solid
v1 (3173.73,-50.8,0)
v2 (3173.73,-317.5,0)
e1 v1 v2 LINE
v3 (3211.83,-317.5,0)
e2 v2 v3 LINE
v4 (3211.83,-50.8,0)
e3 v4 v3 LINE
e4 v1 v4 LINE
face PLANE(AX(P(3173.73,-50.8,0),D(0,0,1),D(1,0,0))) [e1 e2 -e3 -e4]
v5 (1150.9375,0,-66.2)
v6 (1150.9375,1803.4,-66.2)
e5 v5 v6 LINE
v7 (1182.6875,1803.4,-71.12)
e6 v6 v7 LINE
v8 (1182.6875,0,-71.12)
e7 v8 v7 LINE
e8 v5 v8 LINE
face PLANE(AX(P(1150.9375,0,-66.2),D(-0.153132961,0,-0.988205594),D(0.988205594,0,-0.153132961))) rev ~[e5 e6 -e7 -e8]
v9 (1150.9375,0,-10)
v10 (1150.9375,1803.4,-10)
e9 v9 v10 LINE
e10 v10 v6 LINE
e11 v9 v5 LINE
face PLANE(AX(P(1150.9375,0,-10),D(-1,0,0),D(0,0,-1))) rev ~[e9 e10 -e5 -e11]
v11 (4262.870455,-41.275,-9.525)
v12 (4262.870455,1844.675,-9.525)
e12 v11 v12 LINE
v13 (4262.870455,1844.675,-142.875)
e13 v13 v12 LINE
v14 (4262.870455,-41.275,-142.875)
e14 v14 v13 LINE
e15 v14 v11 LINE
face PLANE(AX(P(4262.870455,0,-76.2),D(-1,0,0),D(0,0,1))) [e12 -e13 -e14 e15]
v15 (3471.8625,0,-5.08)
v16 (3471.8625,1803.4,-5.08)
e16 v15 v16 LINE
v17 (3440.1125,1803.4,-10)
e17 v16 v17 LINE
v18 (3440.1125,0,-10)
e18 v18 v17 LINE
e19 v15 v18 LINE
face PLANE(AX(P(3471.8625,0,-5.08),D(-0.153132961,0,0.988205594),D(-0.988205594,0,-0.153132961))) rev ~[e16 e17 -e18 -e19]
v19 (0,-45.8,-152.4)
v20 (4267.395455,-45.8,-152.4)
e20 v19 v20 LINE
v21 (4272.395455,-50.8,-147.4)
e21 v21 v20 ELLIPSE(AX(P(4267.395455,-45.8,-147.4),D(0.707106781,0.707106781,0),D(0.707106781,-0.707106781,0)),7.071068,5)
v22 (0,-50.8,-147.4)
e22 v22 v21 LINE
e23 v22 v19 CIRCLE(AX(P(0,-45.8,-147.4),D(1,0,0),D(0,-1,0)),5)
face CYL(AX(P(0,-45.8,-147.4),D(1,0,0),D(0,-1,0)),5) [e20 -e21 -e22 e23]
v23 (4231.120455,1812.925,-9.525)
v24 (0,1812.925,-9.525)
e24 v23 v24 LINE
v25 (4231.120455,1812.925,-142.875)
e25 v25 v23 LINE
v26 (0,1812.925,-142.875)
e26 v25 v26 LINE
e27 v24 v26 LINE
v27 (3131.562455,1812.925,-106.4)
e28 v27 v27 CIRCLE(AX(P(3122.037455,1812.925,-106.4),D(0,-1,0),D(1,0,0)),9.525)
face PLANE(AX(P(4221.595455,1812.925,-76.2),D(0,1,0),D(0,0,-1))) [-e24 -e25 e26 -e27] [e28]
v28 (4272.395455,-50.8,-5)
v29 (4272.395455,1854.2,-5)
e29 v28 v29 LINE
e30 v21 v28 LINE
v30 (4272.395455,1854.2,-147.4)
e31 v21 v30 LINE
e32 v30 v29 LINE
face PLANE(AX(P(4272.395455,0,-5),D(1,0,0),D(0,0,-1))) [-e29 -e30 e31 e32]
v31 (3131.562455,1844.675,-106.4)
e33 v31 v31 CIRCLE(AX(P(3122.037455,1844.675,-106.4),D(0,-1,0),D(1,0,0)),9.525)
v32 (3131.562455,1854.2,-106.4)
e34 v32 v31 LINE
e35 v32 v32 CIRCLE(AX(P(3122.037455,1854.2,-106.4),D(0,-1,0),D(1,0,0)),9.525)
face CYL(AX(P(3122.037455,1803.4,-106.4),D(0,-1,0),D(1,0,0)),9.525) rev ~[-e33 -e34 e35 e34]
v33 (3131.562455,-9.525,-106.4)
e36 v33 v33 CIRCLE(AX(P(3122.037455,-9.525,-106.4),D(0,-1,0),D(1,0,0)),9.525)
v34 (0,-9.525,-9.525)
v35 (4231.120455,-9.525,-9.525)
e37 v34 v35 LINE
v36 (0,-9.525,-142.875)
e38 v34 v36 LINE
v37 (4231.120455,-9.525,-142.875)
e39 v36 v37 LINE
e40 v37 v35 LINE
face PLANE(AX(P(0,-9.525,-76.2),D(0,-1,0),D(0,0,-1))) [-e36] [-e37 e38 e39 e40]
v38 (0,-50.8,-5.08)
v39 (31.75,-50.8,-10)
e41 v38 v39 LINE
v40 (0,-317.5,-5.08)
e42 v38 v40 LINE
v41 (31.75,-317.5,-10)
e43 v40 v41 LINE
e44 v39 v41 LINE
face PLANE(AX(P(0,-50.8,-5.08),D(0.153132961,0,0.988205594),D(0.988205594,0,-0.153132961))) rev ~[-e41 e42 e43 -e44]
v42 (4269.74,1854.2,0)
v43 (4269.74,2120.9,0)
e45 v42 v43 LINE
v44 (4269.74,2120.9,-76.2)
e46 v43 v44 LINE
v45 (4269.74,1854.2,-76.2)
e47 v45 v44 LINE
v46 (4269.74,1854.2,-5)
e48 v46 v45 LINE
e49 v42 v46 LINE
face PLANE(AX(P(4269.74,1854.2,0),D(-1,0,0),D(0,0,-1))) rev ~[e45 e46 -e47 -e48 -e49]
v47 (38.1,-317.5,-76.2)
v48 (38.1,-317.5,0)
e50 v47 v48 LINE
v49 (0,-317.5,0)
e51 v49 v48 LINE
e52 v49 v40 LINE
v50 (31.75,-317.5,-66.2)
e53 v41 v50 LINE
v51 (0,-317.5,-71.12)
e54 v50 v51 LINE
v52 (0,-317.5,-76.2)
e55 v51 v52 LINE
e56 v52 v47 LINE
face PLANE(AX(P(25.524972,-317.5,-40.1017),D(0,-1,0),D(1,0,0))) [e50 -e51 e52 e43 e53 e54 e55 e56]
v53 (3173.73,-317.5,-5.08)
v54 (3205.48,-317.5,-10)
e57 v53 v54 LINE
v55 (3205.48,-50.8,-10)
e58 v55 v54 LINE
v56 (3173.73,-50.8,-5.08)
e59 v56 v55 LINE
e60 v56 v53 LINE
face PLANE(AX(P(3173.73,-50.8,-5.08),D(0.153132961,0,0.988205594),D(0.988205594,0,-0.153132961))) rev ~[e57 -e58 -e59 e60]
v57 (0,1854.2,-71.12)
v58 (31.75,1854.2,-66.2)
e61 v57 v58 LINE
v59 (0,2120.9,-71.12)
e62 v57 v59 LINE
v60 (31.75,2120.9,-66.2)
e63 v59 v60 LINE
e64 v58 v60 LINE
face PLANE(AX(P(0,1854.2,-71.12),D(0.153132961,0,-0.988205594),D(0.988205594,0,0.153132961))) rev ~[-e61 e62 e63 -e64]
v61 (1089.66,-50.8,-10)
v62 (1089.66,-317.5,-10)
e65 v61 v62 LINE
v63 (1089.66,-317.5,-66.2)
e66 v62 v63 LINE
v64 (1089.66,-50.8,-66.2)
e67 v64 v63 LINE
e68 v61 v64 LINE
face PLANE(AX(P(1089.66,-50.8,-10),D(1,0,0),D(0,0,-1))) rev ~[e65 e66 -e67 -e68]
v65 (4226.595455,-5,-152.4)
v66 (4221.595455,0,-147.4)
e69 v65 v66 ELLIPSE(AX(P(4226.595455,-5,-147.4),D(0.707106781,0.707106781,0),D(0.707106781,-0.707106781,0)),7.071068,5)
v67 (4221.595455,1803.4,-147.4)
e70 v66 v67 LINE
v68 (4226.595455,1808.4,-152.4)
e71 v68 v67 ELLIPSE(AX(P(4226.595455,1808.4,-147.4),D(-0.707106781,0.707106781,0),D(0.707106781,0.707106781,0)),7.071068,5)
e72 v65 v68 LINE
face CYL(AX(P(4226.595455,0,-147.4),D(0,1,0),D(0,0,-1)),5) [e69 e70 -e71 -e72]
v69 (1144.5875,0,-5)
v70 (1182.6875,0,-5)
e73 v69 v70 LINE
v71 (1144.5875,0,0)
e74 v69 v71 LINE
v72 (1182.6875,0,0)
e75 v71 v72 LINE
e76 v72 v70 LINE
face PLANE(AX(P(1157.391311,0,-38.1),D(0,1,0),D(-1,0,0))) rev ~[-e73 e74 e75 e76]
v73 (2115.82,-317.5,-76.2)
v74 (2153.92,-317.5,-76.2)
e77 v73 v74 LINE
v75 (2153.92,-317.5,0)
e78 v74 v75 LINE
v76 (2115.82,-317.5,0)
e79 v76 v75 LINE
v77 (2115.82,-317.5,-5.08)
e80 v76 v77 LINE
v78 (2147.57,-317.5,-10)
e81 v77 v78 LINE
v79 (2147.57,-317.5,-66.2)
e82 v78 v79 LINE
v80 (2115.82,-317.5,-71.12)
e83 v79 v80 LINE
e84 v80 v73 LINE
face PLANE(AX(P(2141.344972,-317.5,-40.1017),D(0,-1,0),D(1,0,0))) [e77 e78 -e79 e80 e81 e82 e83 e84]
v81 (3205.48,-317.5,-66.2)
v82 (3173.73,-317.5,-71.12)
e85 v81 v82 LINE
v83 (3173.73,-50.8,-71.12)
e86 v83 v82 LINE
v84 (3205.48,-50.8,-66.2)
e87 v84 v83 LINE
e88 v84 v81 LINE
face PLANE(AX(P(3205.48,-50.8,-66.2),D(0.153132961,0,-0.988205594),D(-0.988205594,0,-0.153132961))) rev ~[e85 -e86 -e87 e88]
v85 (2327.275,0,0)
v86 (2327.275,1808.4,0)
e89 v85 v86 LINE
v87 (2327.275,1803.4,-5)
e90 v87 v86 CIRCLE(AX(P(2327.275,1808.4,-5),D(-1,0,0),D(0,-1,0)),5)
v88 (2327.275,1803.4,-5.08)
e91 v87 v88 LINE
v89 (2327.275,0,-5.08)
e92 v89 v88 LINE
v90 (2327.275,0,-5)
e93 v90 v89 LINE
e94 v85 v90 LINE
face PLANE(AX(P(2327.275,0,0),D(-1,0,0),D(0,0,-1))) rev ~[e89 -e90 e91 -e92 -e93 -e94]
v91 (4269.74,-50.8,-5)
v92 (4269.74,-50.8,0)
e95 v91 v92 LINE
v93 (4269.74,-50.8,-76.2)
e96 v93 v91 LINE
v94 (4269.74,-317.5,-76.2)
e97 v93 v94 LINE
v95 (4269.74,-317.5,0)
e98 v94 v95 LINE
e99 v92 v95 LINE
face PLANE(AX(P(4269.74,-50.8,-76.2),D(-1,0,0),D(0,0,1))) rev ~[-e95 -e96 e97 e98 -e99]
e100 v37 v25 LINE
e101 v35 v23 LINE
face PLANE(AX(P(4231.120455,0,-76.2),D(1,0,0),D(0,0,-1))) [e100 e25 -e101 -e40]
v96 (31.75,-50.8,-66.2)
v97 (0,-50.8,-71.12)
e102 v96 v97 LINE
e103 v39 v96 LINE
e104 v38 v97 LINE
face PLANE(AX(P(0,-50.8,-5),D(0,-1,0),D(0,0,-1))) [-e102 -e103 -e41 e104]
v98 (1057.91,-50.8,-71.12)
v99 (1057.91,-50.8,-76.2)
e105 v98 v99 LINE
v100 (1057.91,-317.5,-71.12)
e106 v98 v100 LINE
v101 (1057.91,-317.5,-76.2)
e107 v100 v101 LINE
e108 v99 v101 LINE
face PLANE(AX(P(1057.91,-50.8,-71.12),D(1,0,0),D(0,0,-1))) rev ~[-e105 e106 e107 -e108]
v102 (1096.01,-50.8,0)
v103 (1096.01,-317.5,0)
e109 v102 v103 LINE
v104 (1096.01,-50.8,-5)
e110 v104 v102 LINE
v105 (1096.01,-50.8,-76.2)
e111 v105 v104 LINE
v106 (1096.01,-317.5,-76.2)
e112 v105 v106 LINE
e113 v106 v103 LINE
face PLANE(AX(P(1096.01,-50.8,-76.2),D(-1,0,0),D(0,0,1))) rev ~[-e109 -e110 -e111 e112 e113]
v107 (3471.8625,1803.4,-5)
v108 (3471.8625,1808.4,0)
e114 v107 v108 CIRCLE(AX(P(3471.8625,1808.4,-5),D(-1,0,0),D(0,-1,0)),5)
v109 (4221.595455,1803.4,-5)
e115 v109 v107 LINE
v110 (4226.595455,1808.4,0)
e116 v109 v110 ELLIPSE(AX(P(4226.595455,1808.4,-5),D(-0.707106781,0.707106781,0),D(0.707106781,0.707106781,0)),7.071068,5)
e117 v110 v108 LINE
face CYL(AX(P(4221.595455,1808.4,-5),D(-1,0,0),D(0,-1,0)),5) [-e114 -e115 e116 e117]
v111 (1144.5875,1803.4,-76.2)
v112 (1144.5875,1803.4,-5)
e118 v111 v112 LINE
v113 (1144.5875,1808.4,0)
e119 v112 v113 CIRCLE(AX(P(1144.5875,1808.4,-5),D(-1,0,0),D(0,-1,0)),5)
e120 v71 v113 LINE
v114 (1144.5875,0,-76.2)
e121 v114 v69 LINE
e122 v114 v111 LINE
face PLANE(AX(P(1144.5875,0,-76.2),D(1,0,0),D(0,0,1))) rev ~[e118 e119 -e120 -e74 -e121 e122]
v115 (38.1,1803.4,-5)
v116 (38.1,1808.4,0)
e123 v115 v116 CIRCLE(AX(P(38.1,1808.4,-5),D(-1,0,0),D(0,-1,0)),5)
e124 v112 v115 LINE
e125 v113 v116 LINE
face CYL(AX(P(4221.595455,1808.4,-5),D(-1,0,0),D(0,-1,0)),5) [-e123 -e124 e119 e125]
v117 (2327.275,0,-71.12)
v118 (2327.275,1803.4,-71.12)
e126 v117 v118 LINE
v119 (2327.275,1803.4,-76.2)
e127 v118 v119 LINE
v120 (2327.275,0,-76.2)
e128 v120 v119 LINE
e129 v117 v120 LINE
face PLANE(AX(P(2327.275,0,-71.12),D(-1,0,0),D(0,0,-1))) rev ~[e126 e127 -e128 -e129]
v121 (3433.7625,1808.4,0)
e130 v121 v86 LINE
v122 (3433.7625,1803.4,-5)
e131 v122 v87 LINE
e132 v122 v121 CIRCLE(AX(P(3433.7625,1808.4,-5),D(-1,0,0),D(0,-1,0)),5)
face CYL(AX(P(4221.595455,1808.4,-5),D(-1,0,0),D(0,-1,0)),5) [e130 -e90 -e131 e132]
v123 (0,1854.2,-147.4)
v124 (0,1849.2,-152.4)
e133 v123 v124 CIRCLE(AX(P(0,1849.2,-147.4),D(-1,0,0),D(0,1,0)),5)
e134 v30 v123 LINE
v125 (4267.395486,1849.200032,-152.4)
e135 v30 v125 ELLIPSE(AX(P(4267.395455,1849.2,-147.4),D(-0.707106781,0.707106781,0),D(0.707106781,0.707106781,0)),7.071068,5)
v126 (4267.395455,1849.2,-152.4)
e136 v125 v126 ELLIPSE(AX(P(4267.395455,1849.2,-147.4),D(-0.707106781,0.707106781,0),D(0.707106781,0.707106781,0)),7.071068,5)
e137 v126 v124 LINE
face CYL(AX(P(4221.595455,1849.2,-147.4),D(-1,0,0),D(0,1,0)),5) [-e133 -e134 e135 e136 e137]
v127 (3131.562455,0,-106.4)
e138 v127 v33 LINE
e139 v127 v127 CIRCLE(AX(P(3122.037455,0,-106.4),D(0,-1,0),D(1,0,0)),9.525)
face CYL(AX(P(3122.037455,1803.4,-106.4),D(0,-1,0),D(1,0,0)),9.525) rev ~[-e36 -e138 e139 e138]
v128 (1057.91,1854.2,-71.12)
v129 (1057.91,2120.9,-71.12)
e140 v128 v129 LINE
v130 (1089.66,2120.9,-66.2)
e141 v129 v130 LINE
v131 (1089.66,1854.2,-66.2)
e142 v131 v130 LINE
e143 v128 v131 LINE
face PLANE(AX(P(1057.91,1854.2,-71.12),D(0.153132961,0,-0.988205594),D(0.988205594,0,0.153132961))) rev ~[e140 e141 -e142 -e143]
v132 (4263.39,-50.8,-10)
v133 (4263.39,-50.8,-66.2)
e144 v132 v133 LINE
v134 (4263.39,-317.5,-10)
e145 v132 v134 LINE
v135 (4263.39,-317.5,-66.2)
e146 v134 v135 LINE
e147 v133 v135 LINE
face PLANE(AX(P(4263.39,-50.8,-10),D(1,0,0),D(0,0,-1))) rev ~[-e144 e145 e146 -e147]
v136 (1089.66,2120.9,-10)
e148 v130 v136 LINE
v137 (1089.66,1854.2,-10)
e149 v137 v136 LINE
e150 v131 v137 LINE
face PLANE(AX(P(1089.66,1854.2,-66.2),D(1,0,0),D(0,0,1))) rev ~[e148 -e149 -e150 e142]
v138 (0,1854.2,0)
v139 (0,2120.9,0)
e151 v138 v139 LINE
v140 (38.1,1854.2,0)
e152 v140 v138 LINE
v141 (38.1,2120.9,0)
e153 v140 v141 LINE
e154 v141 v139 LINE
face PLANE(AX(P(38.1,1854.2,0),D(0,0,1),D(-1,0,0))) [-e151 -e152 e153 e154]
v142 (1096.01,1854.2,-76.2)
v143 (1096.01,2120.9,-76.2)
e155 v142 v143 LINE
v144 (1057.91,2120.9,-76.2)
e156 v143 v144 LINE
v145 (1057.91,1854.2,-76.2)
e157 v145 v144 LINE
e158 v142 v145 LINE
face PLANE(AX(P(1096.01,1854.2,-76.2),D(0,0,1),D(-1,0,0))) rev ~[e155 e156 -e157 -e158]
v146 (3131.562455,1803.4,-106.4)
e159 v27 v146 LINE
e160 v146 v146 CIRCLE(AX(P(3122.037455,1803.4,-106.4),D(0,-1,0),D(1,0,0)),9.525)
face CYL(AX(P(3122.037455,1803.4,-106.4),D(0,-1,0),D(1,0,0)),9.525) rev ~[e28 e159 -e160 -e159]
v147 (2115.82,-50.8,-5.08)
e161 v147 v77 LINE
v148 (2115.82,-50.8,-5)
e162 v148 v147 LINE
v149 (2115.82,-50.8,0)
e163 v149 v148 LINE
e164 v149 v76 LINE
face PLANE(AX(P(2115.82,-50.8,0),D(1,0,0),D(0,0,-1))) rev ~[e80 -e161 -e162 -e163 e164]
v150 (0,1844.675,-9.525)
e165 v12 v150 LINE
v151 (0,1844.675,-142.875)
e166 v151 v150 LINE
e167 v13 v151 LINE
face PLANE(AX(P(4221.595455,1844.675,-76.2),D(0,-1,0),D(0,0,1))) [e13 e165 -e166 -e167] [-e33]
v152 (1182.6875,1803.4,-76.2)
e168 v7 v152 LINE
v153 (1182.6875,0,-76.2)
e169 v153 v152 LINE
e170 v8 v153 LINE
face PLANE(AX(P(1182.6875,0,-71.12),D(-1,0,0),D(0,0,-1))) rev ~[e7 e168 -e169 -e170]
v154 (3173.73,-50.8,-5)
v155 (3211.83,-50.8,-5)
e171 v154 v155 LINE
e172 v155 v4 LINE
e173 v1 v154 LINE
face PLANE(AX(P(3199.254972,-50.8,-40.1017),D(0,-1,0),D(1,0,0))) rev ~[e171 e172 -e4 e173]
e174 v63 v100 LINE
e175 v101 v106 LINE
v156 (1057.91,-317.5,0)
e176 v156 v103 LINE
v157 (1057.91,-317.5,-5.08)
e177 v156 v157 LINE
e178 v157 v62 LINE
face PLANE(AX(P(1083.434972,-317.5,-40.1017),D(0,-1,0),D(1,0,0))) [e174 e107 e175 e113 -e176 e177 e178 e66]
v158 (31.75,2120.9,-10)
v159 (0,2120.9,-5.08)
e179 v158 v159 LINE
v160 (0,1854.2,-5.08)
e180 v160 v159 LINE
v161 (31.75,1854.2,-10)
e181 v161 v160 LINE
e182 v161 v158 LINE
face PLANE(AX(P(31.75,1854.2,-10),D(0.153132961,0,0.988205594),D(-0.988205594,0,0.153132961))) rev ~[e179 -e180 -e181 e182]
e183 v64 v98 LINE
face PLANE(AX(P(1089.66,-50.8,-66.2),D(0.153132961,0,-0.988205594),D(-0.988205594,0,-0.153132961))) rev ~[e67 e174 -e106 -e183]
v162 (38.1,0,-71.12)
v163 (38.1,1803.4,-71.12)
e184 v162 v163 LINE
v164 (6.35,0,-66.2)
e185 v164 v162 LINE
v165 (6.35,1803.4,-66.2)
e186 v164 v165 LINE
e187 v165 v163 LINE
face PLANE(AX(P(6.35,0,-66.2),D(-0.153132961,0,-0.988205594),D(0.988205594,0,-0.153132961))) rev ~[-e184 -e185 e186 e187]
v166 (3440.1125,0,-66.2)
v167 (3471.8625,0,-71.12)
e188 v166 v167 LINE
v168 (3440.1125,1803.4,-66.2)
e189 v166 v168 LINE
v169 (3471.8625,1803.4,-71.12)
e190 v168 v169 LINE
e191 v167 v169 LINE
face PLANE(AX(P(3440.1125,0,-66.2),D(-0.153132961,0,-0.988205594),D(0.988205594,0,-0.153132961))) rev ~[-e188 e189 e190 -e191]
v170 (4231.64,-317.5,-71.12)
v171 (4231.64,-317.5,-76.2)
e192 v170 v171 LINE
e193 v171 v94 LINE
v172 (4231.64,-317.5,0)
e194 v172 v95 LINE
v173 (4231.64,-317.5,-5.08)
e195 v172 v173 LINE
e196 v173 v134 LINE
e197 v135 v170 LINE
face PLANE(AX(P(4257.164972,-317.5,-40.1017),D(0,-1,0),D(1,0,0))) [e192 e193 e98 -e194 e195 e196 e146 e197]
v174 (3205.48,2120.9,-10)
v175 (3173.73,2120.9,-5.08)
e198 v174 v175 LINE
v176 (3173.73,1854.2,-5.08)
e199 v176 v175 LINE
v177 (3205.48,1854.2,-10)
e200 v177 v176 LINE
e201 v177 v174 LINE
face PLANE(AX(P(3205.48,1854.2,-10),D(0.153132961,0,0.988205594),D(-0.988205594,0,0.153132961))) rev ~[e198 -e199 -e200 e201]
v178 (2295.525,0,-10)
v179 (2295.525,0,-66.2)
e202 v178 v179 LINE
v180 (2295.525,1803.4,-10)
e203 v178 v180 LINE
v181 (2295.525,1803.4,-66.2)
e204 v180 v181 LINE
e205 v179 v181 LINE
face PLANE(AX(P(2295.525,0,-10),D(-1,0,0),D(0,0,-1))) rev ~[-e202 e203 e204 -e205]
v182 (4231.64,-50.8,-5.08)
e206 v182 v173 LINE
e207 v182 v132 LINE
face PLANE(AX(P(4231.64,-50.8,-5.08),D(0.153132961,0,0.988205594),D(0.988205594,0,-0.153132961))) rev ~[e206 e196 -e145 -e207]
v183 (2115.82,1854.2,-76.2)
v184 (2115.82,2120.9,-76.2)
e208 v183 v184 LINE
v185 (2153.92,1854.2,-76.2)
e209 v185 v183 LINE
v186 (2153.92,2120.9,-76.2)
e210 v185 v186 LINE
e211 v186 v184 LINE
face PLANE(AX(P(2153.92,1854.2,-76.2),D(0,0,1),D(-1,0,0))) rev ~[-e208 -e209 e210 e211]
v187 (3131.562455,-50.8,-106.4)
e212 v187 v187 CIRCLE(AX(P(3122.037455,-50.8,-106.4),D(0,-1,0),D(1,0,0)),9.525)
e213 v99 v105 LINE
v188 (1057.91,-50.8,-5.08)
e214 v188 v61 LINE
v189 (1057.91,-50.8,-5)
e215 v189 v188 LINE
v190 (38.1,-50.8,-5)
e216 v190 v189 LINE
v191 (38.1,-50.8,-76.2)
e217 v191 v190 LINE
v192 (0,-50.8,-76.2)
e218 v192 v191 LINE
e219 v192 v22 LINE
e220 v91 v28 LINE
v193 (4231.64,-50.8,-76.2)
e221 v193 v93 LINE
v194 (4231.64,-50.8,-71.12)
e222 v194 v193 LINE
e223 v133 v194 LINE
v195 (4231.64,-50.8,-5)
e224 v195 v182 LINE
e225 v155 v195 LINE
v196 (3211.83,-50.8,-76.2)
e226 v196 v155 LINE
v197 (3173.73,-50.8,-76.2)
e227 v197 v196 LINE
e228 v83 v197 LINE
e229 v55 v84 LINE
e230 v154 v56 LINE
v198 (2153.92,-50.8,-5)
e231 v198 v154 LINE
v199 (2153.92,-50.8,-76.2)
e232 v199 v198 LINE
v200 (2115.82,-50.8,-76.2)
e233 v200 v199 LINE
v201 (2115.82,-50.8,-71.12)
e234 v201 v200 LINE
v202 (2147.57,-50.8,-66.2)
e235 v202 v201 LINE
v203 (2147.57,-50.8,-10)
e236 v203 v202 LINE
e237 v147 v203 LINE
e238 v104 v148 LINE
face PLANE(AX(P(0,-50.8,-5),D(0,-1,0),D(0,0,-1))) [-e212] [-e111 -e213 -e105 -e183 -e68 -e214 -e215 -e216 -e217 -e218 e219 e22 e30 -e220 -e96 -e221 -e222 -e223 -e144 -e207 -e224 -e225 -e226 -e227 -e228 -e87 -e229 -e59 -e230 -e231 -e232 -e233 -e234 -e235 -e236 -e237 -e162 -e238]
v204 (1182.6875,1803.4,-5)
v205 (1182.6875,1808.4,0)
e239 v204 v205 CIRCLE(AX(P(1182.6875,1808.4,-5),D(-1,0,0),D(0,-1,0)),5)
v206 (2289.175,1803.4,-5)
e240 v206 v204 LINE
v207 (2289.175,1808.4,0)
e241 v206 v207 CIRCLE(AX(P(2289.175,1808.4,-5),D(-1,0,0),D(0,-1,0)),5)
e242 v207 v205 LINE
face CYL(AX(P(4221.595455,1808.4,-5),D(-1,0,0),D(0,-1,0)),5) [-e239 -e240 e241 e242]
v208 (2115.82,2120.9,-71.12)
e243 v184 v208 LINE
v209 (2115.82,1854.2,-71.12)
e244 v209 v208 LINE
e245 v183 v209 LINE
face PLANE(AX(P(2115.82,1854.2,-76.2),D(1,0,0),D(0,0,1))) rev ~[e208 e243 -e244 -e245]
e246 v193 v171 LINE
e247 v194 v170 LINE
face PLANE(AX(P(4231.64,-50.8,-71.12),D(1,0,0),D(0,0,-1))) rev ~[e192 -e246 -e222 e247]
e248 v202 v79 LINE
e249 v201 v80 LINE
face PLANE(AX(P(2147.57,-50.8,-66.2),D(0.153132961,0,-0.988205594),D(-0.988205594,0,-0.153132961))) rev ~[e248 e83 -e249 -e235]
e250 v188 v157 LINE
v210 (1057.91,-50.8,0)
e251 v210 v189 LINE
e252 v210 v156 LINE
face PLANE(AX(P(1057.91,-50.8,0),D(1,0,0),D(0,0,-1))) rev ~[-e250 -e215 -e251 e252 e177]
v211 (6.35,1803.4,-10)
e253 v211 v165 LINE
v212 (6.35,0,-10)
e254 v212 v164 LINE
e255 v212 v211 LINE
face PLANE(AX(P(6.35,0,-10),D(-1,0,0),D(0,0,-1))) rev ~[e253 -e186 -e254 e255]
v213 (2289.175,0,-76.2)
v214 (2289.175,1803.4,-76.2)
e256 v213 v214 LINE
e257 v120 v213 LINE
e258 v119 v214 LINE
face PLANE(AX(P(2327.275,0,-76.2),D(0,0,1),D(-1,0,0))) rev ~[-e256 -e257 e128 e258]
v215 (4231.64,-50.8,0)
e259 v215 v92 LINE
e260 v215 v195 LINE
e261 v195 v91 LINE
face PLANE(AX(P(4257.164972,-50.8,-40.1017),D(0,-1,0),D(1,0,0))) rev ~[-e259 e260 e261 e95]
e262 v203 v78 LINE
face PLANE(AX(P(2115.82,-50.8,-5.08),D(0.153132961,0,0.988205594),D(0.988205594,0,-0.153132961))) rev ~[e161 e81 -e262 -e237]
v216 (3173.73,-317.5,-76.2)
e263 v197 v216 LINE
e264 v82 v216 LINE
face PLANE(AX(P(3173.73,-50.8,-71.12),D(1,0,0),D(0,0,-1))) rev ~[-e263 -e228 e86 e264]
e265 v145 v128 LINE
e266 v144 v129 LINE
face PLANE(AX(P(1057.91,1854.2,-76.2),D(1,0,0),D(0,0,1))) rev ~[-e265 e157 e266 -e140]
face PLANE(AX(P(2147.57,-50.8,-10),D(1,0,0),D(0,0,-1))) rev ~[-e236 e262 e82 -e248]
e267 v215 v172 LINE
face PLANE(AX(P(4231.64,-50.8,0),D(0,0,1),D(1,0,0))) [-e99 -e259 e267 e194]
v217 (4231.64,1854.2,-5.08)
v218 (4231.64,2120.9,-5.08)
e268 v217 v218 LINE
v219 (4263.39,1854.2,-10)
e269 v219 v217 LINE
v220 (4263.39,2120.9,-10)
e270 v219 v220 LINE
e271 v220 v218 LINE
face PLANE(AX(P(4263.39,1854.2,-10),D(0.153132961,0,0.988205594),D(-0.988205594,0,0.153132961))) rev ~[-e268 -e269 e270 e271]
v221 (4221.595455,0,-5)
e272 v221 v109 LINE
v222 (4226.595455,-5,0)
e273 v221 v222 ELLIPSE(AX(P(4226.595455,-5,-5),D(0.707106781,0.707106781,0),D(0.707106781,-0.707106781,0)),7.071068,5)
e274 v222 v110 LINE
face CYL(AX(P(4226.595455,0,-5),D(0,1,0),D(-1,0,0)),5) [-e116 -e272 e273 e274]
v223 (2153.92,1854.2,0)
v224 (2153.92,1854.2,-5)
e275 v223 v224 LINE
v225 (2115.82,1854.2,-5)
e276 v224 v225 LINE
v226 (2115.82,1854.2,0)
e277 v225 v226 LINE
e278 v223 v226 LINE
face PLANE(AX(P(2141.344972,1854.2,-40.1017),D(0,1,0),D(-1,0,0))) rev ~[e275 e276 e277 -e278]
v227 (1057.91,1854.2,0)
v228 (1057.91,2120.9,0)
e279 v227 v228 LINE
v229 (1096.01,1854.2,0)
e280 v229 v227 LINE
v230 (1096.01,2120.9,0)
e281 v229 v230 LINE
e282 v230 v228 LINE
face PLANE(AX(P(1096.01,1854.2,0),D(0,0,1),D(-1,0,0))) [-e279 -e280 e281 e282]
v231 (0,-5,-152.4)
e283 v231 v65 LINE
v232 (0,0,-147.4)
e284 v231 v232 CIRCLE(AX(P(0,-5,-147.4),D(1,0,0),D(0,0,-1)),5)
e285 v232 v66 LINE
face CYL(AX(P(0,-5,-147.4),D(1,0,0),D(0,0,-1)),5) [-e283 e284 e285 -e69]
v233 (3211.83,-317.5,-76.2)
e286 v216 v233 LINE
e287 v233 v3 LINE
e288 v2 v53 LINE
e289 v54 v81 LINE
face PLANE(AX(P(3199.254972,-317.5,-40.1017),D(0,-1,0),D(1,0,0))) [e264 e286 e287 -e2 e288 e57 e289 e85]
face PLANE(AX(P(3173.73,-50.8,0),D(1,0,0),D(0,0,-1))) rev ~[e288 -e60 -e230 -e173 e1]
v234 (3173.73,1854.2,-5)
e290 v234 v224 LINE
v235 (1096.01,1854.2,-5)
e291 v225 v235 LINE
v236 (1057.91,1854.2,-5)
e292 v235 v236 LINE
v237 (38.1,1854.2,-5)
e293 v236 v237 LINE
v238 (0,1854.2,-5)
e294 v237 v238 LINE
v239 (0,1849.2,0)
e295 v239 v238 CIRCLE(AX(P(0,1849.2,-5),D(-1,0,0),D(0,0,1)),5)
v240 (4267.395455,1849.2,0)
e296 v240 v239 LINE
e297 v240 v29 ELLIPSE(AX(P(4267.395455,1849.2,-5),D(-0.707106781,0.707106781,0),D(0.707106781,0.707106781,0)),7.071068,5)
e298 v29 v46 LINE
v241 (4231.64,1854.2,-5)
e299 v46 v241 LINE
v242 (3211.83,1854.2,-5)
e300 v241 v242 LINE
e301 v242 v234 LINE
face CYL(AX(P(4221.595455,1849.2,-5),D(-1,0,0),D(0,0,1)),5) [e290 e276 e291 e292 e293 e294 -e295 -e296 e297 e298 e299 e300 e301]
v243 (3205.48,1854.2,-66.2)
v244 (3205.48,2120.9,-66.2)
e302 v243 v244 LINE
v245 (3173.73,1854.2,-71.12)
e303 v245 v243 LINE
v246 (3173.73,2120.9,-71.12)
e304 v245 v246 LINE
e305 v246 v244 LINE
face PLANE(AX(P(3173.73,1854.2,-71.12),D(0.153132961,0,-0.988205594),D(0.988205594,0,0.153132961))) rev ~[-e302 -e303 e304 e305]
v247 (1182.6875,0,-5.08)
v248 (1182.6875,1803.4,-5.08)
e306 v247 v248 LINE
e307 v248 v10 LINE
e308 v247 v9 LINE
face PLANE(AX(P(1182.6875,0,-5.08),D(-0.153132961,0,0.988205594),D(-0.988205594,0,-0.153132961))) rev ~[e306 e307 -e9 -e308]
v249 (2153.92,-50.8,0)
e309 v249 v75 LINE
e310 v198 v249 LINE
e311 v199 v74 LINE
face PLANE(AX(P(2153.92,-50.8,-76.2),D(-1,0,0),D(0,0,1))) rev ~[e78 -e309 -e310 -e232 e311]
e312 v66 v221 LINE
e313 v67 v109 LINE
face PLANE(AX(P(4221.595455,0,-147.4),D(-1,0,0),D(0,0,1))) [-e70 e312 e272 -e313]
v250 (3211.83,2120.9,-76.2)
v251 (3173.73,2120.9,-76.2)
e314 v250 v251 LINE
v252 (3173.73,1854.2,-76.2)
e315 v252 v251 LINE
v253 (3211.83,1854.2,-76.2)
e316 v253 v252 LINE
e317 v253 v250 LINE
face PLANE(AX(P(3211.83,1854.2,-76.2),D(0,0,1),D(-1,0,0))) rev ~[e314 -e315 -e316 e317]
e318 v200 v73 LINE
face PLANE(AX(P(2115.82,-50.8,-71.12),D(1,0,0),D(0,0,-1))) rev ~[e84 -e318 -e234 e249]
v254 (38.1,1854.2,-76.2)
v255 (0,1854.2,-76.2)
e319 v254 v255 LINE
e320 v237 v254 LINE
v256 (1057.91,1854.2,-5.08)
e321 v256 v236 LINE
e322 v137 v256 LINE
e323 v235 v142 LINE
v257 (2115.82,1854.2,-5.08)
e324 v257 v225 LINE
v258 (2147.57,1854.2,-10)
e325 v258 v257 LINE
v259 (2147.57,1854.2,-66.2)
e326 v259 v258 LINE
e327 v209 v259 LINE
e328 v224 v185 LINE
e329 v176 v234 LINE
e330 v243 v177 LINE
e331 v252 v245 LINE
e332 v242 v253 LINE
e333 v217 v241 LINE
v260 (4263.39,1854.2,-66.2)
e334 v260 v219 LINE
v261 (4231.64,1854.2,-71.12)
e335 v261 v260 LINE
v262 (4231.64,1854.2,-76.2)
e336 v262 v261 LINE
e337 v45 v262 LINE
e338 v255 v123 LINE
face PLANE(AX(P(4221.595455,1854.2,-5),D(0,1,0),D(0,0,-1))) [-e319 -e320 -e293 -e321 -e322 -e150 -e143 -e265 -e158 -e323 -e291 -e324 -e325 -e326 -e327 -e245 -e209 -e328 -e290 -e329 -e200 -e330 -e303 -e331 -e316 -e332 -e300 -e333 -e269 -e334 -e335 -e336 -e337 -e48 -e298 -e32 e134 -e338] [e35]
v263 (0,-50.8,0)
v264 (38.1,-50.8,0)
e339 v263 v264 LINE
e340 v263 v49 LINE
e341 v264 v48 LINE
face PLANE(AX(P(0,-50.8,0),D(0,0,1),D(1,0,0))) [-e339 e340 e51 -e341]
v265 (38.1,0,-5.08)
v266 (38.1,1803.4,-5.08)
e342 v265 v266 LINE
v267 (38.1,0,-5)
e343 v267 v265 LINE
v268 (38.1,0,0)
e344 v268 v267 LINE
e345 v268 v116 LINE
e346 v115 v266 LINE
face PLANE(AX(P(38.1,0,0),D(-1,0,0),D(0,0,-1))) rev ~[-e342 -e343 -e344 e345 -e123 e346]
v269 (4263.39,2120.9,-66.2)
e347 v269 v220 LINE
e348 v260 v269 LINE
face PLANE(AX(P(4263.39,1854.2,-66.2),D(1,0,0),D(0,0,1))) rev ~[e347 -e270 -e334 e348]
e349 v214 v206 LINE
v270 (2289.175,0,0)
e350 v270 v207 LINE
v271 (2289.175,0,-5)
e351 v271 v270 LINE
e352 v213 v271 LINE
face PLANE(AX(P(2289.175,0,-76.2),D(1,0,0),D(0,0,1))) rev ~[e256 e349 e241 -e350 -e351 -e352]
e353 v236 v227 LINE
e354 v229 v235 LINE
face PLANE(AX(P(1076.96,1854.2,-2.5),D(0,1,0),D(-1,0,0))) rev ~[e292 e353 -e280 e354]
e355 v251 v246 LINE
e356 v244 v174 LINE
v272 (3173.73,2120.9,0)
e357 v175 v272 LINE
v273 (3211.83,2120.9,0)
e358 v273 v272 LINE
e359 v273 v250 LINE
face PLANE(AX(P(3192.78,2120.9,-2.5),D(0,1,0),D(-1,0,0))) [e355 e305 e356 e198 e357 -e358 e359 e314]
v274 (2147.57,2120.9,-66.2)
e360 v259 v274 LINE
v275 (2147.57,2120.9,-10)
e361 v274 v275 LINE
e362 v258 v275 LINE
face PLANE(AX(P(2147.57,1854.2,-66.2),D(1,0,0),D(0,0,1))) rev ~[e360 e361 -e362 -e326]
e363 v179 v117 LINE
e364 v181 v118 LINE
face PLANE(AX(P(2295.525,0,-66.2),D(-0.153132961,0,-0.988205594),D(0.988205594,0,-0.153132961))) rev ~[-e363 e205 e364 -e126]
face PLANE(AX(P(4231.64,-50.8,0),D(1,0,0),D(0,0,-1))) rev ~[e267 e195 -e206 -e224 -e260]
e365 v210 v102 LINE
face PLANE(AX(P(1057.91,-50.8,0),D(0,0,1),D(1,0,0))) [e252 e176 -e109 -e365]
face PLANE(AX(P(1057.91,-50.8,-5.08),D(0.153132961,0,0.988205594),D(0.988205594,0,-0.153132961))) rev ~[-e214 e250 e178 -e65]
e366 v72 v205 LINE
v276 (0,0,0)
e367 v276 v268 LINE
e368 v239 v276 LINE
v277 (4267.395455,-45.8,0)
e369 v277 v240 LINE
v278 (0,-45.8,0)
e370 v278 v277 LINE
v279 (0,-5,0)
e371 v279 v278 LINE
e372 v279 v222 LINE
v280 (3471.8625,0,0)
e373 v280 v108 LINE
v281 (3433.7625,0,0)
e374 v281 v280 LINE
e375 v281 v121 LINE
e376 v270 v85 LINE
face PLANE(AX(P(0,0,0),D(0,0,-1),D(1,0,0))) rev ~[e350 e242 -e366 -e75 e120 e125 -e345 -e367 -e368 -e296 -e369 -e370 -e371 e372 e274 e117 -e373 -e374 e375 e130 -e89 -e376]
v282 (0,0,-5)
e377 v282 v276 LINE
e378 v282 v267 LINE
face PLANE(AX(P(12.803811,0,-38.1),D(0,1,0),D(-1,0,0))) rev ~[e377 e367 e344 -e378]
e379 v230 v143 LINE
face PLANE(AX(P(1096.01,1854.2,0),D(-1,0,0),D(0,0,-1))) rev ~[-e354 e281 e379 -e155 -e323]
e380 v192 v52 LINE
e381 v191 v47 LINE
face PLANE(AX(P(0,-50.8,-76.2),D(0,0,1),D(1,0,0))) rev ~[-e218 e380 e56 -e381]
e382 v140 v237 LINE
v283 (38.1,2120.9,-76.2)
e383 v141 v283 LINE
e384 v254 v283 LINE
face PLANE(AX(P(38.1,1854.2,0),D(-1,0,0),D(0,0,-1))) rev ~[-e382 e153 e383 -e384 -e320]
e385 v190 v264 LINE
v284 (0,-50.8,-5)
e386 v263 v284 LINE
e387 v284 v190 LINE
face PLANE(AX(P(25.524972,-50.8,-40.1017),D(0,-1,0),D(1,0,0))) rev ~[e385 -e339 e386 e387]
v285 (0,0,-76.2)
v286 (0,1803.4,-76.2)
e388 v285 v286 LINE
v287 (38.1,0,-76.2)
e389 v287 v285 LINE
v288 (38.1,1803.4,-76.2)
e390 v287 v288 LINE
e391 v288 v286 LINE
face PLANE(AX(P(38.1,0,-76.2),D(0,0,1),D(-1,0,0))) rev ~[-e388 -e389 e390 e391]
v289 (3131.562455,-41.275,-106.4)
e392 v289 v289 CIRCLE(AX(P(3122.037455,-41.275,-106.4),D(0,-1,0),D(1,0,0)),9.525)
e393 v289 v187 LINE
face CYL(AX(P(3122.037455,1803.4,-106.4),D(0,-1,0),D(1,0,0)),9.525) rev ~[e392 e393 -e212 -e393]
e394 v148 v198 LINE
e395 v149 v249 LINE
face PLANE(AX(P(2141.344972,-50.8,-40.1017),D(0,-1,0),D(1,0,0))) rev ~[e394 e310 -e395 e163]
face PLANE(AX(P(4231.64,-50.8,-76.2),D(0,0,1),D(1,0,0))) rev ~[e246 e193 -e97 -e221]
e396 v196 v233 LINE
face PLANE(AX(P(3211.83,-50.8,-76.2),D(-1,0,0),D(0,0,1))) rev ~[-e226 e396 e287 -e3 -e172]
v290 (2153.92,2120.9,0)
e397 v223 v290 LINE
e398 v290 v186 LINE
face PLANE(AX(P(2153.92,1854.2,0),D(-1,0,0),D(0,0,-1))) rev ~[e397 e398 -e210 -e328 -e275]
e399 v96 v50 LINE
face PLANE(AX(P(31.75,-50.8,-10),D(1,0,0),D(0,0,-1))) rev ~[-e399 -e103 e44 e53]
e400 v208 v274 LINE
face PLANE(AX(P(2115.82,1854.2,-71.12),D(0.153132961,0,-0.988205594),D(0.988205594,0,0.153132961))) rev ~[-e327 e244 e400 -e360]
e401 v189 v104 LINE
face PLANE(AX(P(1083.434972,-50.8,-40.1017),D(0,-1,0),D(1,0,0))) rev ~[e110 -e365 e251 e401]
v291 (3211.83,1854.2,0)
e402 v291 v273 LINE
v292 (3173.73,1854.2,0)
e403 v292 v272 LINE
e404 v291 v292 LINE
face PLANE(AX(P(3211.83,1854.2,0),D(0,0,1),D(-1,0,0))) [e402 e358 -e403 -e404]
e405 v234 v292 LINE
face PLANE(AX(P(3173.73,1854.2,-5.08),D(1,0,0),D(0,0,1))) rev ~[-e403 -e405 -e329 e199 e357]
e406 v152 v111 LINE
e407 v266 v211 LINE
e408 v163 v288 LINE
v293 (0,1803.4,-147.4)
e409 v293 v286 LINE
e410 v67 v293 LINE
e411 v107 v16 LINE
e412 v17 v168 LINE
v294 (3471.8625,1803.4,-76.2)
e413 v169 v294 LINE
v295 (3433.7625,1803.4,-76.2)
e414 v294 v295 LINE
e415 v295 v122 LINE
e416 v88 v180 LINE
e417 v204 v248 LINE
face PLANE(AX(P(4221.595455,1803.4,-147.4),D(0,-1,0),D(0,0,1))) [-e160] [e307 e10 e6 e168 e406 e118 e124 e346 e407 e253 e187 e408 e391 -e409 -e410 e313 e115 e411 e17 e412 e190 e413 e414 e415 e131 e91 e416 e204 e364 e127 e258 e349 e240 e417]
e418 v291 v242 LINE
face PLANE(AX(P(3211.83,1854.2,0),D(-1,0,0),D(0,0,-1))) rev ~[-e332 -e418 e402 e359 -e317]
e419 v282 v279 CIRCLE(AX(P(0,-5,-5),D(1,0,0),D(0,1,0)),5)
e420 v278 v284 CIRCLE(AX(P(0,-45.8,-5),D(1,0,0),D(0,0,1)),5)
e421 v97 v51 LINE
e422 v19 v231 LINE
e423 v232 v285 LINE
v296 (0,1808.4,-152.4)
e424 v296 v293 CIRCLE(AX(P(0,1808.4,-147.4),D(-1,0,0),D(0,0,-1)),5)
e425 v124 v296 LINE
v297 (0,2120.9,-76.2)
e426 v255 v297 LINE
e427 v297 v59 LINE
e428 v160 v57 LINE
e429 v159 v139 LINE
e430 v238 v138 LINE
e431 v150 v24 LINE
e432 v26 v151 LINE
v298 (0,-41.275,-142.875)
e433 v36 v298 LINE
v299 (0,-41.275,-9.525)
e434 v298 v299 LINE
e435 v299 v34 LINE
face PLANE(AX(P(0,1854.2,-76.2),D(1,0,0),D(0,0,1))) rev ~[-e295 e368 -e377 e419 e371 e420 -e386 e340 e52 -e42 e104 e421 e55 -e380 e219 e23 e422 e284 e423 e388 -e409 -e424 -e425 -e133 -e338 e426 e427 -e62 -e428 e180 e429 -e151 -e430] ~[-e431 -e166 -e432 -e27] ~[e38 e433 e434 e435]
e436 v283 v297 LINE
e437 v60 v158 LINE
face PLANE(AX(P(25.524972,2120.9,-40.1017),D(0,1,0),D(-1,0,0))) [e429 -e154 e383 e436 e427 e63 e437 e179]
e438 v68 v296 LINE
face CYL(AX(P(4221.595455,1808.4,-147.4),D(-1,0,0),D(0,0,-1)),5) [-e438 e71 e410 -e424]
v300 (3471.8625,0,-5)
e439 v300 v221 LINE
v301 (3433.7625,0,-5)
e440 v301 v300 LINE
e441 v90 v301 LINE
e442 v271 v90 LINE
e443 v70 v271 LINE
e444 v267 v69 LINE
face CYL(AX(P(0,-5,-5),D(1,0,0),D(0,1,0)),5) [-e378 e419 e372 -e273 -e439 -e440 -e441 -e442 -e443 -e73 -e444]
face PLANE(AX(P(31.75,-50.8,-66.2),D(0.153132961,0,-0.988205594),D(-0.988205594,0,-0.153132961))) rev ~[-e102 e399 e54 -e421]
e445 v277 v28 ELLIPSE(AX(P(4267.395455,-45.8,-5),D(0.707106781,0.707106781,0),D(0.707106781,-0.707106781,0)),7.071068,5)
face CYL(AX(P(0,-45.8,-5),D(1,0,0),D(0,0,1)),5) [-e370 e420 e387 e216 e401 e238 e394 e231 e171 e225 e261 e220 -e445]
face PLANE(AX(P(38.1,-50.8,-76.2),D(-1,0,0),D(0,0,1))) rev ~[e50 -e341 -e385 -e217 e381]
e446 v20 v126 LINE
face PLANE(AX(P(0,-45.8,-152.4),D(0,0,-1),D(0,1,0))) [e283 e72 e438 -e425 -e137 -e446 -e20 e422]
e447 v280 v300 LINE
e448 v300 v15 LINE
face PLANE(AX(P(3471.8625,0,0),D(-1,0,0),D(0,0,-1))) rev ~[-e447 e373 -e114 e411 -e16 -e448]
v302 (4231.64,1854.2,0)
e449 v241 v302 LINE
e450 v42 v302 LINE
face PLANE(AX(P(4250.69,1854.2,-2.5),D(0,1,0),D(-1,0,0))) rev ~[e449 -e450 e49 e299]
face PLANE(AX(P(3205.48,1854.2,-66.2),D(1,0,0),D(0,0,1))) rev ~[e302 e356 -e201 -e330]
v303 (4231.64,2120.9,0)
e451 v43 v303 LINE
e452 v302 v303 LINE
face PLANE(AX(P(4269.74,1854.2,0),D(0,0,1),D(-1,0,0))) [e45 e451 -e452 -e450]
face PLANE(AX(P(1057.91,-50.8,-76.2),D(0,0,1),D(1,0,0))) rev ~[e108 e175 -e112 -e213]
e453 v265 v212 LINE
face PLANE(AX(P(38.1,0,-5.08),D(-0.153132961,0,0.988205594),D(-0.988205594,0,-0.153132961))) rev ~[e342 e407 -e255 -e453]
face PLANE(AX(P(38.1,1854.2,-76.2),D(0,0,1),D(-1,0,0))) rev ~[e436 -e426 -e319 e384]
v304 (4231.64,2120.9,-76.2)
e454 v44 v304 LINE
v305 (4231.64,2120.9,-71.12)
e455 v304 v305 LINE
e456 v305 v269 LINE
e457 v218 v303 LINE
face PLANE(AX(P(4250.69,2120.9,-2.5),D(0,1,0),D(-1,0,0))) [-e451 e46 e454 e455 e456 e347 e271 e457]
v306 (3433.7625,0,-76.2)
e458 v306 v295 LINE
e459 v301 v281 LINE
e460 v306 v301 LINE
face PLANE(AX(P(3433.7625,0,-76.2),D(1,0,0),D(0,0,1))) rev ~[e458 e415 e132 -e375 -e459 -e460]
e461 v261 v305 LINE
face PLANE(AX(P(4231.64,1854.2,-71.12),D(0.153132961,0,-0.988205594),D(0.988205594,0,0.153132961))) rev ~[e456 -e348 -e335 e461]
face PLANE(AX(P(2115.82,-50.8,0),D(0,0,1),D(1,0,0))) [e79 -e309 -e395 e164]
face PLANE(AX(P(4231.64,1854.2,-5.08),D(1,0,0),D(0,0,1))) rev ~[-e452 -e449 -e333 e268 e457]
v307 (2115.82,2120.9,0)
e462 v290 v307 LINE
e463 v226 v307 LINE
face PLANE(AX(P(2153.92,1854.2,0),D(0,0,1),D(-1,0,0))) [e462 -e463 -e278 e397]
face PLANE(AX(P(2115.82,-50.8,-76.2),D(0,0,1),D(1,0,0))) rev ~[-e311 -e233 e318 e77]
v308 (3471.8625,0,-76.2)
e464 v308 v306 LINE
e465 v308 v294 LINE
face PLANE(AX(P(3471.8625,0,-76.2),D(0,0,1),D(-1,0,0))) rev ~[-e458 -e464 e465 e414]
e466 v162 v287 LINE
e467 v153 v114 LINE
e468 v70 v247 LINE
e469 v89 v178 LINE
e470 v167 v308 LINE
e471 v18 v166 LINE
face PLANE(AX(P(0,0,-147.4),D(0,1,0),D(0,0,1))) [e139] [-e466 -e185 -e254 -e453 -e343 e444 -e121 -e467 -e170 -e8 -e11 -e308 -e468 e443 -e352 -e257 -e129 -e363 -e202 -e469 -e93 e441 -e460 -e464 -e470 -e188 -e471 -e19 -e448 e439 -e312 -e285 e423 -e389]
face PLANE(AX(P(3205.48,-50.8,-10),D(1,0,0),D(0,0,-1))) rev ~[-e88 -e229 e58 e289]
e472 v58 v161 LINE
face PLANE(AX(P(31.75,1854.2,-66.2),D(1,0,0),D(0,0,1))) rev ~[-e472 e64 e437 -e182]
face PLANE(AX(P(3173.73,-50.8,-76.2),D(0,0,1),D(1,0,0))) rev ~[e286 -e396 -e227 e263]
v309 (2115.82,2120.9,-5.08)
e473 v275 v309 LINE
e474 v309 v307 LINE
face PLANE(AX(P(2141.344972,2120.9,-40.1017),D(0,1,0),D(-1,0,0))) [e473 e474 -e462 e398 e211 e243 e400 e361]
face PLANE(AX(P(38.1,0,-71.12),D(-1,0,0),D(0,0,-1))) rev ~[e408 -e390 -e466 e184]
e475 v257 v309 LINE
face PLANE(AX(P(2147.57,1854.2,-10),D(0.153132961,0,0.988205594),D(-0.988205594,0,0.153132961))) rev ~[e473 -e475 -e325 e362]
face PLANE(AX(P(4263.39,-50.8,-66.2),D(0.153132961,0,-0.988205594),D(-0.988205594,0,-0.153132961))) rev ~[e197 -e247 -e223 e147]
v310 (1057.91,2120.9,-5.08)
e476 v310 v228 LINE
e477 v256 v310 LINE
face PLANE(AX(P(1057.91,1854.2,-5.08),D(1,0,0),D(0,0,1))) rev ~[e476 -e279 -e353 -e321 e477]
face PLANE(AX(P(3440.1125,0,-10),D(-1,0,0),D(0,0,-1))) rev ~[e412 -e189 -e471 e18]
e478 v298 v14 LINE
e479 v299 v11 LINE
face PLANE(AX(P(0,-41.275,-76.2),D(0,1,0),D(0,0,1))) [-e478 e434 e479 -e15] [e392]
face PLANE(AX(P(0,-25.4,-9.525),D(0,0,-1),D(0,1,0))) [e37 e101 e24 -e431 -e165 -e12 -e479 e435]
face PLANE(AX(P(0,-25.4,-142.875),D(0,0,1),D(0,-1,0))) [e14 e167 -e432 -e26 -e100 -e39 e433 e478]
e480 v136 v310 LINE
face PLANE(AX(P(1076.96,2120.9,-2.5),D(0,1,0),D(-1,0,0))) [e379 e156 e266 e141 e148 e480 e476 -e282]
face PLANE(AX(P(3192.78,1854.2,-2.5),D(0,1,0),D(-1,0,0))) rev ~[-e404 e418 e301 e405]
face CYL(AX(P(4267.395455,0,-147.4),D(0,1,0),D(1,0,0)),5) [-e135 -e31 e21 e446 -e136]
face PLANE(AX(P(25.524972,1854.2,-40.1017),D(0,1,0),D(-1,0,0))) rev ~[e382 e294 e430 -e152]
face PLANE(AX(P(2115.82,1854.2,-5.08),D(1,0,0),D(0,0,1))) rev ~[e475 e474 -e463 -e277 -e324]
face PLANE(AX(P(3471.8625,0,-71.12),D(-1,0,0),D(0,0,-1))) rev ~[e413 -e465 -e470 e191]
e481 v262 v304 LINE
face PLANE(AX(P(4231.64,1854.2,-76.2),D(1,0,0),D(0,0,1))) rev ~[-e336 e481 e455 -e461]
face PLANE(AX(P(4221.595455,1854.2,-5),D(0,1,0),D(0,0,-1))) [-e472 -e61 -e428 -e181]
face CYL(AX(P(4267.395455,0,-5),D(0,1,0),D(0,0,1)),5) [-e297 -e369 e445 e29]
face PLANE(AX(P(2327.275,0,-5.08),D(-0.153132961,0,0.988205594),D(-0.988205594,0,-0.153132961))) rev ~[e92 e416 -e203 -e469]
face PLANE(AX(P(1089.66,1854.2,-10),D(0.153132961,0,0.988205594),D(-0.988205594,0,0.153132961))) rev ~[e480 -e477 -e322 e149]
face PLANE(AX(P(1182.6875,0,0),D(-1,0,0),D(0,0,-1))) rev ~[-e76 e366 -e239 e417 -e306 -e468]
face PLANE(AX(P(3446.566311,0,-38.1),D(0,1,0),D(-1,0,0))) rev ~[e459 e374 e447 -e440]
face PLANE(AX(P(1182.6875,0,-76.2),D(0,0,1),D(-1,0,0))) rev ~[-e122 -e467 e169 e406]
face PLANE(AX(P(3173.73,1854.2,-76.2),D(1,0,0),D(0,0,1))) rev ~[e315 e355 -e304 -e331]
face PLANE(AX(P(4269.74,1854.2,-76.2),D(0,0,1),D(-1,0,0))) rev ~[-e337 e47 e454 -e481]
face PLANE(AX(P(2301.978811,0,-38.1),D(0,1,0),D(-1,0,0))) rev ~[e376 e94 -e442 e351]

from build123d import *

# Parameters (mm, degrees)
F1_W      = 31.75
F1_H      = 133.35
F5_W      = 38.1
F5_H      = 5
F6_DEPTH  = 266.7
F7_W      = 38.1
F7_H      = 5
F8_DEPTH  = 266.7
F9_R      = 9.525
F10_DEPTH = 2640


with BuildPart() as f2:
    # F2: sweep along a path in F0
    with BuildLine(Plane.XY) as f2_path:
        Line((0, 0), (4221.5954545455, 0))
        Line((4221.5954545455, 0), (4221.5954545455, 1803.4))
        Line((4221.5954545455, 1803.4), (0, 1803.4))
    # F1 (on Right) → F2 (sweep)
    with BuildSketch(Plane.YZ):
        with BuildLine():
            ThreePointArc((0, -5), (-1.4644660941, -1.4644660941), (-5, 0))
            Line((-5, 0), (-45.8, 0))
            ThreePointArc((-45.8, 0), (-49.3355339059, -1.4644660941), (-50.8, -5))
            Line((-50.8, -5), (-50.8, -147.4))
            ThreePointArc((-50.8, -147.4), (-49.3355339059, -150.9355339059), (-45.8, -152.4))
            Line((-45.8, -152.4), (-5, -152.4))
            ThreePointArc((-5, -152.4), (-1.4644660941, -150.9355339059), (0, -147.4))
            Line((0, -147.4), (0, -5))
        make_face()
        with Locations((-25.4, -76.2)):
            Rectangle(F1_W, F1_H, mode=Mode.SUBTRACT)
    sweep(path=f2_path.line, transition=Transition.RIGHT)

    # F3 (on face) → F4 (join, up to the next surface of F2)
    with BuildSketch(Plane(origin=(0, 0, 0), x_dir=(-1, 0, 0), z_dir=(0, 1, 0))):
        Polygon((0, 0), (-38.1, 0), (-38.1, -5.08), (-6.35, -10), (-6.35, -66.2), (-38.1, -71.12), (-38.1, -76.2), (0, -76.2), align=None)
        Polygon((-1150.9375, -10), (-1150.9375, -66.2), (-1182.6875, -71.12), (-1182.6875, -76.2), (-1144.5875, -76.2), (-1144.5875, 0), (-1182.6875, 0), (-1182.6875, -5.08), align=None)
        Polygon((-2295.525, -10), (-2295.525, -66.2), (-2327.275, -71.12), (-2327.275, -76.2), (-2289.175, -76.2), (-2289.175, 0), (-2327.275, 0), (-2327.275, -5.08), align=None)
        Polygon((-3440.1125, -10), (-3440.1125, -66.2), (-3471.8625, -71.12), (-3471.8625, -76.2), (-3433.7625, -76.2), (-3433.7625, 0), (-3471.8625, 0), (-3471.8625, -5.08), align=None)
    extrude(until=Until.NEXT)

    # F5 (on face) → F6 (join)
    with BuildSketch(Plane.XZ.offset(50.8)):
        Polygon((38.1, -5), (0, -5), (0, -5.08), (31.75, -10), (31.75, -66.2), (0, -71.12), (0, -76.2), (38.1, -76.2), align=None)
        Polygon((1096.01, -5), (1057.91, -5), (1057.91, -5.08), (1089.66, -10), (1089.66, -66.2), (1057.91, -71.12), (1057.91, -76.2), (1096.01, -76.2), align=None)
        Polygon((2153.92, -5), (2115.82, -5), (2115.82, -5.08), (2147.57, -10), (2147.57, -66.2), (2115.82, -71.12), (2115.82, -76.2), (2153.92, -76.2), align=None)
        Polygon((3211.83, -5), (3173.73, -5), (3173.73, -5.08), (3205.48, -10), (3205.48, -66.2), (3173.73, -71.12), (3173.73, -76.2), (3211.83, -76.2), align=None)
        Polygon((4269.74, -76.2), (4269.74, -5), (4231.64, -5), (4231.64, -5.08), (4263.39, -10), (4263.39, -66.2), (4231.64, -71.12), (4231.64, -76.2), align=None)
        with Locations((4250.69, -2.5)):
            Rectangle(F5_W, F5_H)
        with Locations((3192.78, -2.5)):
            Rectangle(F5_W, F5_H)
        with Locations((2134.87, -2.5)):
            Rectangle(F5_W, F5_H)
        with Locations((1076.96, -2.5)):
            Rectangle(F5_W, F5_H)
        with Locations((19.05, -2.5)):
            Rectangle(F5_W, F5_H)
    extrude(amount=F6_DEPTH)

    # F7 (on face) → F8 (join)
    with BuildSketch(Plane(origin=(0, 1854.2, 0), x_dir=(-1, 0, 0), z_dir=(0, 1, 0))):
        Polygon((0, -5), (-38.1, -5), (-38.1, -76.2), (0, -76.2), (0, -71.12), (-31.75, -66.2), (-31.75, -10), (0, -5.08), align=None)
        with Locations((-19.05, -2.5)):
            Rectangle(F7_W, F7_H)
        with Locations((-1076.96, -2.5)):
            Rectangle(F7_W, F7_H)
        Polygon((-1057.91, -5.08), (-1057.91, -5), (-1096.01, -5), (-1096.01, -76.2), (-1057.91, -76.2), (-1057.91, -71.12), (-1089.66, -66.2), (-1089.66, -10), align=None)
        Polygon((-2115.82, -5.08), (-2115.82, -5), (-2153.92, -5), (-2153.92, -76.2), (-2115.82, -76.2), (-2115.82, -71.12), (-2147.57, -66.2), (-2147.57, -10), align=None)
        with Locations((-2134.87, -2.5)):
            Rectangle(F7_W, F7_H)
        with Locations((-3192.78, -2.5)):
            Rectangle(F7_W, F7_H)
        Polygon((-3173.73, -5.08), (-3173.73, -5), (-3211.83, -5), (-3211.83, -76.2), (-3173.73, -76.2), (-3173.73, -71.12), (-3205.48, -66.2), (-3205.48, -10), align=None)
        with Locations((-4250.69, -2.5)):
            Rectangle(F7_W, F7_H)
        Polygon((-4231.64, -5), (-4269.74, -5), (-4269.74, -76.2), (-4231.64, -76.2), (-4231.64, -71.12), (-4263.39, -66.2), (-4263.39, -10), (-4231.64, -5.08), align=None)
    extrude(amount=F8_DEPTH)

    # F9 (on face) → F10 (cut, symmetric)
    with BuildSketch(Plane.XZ.offset(-1803.4)):
        with Locations((3122.0374545455, -106.4)):
            Circle(F9_R)
    extrude(amount=F10_DEPTH, both=True, mode=Mode.SUBTRACT)


solid = f2.part
